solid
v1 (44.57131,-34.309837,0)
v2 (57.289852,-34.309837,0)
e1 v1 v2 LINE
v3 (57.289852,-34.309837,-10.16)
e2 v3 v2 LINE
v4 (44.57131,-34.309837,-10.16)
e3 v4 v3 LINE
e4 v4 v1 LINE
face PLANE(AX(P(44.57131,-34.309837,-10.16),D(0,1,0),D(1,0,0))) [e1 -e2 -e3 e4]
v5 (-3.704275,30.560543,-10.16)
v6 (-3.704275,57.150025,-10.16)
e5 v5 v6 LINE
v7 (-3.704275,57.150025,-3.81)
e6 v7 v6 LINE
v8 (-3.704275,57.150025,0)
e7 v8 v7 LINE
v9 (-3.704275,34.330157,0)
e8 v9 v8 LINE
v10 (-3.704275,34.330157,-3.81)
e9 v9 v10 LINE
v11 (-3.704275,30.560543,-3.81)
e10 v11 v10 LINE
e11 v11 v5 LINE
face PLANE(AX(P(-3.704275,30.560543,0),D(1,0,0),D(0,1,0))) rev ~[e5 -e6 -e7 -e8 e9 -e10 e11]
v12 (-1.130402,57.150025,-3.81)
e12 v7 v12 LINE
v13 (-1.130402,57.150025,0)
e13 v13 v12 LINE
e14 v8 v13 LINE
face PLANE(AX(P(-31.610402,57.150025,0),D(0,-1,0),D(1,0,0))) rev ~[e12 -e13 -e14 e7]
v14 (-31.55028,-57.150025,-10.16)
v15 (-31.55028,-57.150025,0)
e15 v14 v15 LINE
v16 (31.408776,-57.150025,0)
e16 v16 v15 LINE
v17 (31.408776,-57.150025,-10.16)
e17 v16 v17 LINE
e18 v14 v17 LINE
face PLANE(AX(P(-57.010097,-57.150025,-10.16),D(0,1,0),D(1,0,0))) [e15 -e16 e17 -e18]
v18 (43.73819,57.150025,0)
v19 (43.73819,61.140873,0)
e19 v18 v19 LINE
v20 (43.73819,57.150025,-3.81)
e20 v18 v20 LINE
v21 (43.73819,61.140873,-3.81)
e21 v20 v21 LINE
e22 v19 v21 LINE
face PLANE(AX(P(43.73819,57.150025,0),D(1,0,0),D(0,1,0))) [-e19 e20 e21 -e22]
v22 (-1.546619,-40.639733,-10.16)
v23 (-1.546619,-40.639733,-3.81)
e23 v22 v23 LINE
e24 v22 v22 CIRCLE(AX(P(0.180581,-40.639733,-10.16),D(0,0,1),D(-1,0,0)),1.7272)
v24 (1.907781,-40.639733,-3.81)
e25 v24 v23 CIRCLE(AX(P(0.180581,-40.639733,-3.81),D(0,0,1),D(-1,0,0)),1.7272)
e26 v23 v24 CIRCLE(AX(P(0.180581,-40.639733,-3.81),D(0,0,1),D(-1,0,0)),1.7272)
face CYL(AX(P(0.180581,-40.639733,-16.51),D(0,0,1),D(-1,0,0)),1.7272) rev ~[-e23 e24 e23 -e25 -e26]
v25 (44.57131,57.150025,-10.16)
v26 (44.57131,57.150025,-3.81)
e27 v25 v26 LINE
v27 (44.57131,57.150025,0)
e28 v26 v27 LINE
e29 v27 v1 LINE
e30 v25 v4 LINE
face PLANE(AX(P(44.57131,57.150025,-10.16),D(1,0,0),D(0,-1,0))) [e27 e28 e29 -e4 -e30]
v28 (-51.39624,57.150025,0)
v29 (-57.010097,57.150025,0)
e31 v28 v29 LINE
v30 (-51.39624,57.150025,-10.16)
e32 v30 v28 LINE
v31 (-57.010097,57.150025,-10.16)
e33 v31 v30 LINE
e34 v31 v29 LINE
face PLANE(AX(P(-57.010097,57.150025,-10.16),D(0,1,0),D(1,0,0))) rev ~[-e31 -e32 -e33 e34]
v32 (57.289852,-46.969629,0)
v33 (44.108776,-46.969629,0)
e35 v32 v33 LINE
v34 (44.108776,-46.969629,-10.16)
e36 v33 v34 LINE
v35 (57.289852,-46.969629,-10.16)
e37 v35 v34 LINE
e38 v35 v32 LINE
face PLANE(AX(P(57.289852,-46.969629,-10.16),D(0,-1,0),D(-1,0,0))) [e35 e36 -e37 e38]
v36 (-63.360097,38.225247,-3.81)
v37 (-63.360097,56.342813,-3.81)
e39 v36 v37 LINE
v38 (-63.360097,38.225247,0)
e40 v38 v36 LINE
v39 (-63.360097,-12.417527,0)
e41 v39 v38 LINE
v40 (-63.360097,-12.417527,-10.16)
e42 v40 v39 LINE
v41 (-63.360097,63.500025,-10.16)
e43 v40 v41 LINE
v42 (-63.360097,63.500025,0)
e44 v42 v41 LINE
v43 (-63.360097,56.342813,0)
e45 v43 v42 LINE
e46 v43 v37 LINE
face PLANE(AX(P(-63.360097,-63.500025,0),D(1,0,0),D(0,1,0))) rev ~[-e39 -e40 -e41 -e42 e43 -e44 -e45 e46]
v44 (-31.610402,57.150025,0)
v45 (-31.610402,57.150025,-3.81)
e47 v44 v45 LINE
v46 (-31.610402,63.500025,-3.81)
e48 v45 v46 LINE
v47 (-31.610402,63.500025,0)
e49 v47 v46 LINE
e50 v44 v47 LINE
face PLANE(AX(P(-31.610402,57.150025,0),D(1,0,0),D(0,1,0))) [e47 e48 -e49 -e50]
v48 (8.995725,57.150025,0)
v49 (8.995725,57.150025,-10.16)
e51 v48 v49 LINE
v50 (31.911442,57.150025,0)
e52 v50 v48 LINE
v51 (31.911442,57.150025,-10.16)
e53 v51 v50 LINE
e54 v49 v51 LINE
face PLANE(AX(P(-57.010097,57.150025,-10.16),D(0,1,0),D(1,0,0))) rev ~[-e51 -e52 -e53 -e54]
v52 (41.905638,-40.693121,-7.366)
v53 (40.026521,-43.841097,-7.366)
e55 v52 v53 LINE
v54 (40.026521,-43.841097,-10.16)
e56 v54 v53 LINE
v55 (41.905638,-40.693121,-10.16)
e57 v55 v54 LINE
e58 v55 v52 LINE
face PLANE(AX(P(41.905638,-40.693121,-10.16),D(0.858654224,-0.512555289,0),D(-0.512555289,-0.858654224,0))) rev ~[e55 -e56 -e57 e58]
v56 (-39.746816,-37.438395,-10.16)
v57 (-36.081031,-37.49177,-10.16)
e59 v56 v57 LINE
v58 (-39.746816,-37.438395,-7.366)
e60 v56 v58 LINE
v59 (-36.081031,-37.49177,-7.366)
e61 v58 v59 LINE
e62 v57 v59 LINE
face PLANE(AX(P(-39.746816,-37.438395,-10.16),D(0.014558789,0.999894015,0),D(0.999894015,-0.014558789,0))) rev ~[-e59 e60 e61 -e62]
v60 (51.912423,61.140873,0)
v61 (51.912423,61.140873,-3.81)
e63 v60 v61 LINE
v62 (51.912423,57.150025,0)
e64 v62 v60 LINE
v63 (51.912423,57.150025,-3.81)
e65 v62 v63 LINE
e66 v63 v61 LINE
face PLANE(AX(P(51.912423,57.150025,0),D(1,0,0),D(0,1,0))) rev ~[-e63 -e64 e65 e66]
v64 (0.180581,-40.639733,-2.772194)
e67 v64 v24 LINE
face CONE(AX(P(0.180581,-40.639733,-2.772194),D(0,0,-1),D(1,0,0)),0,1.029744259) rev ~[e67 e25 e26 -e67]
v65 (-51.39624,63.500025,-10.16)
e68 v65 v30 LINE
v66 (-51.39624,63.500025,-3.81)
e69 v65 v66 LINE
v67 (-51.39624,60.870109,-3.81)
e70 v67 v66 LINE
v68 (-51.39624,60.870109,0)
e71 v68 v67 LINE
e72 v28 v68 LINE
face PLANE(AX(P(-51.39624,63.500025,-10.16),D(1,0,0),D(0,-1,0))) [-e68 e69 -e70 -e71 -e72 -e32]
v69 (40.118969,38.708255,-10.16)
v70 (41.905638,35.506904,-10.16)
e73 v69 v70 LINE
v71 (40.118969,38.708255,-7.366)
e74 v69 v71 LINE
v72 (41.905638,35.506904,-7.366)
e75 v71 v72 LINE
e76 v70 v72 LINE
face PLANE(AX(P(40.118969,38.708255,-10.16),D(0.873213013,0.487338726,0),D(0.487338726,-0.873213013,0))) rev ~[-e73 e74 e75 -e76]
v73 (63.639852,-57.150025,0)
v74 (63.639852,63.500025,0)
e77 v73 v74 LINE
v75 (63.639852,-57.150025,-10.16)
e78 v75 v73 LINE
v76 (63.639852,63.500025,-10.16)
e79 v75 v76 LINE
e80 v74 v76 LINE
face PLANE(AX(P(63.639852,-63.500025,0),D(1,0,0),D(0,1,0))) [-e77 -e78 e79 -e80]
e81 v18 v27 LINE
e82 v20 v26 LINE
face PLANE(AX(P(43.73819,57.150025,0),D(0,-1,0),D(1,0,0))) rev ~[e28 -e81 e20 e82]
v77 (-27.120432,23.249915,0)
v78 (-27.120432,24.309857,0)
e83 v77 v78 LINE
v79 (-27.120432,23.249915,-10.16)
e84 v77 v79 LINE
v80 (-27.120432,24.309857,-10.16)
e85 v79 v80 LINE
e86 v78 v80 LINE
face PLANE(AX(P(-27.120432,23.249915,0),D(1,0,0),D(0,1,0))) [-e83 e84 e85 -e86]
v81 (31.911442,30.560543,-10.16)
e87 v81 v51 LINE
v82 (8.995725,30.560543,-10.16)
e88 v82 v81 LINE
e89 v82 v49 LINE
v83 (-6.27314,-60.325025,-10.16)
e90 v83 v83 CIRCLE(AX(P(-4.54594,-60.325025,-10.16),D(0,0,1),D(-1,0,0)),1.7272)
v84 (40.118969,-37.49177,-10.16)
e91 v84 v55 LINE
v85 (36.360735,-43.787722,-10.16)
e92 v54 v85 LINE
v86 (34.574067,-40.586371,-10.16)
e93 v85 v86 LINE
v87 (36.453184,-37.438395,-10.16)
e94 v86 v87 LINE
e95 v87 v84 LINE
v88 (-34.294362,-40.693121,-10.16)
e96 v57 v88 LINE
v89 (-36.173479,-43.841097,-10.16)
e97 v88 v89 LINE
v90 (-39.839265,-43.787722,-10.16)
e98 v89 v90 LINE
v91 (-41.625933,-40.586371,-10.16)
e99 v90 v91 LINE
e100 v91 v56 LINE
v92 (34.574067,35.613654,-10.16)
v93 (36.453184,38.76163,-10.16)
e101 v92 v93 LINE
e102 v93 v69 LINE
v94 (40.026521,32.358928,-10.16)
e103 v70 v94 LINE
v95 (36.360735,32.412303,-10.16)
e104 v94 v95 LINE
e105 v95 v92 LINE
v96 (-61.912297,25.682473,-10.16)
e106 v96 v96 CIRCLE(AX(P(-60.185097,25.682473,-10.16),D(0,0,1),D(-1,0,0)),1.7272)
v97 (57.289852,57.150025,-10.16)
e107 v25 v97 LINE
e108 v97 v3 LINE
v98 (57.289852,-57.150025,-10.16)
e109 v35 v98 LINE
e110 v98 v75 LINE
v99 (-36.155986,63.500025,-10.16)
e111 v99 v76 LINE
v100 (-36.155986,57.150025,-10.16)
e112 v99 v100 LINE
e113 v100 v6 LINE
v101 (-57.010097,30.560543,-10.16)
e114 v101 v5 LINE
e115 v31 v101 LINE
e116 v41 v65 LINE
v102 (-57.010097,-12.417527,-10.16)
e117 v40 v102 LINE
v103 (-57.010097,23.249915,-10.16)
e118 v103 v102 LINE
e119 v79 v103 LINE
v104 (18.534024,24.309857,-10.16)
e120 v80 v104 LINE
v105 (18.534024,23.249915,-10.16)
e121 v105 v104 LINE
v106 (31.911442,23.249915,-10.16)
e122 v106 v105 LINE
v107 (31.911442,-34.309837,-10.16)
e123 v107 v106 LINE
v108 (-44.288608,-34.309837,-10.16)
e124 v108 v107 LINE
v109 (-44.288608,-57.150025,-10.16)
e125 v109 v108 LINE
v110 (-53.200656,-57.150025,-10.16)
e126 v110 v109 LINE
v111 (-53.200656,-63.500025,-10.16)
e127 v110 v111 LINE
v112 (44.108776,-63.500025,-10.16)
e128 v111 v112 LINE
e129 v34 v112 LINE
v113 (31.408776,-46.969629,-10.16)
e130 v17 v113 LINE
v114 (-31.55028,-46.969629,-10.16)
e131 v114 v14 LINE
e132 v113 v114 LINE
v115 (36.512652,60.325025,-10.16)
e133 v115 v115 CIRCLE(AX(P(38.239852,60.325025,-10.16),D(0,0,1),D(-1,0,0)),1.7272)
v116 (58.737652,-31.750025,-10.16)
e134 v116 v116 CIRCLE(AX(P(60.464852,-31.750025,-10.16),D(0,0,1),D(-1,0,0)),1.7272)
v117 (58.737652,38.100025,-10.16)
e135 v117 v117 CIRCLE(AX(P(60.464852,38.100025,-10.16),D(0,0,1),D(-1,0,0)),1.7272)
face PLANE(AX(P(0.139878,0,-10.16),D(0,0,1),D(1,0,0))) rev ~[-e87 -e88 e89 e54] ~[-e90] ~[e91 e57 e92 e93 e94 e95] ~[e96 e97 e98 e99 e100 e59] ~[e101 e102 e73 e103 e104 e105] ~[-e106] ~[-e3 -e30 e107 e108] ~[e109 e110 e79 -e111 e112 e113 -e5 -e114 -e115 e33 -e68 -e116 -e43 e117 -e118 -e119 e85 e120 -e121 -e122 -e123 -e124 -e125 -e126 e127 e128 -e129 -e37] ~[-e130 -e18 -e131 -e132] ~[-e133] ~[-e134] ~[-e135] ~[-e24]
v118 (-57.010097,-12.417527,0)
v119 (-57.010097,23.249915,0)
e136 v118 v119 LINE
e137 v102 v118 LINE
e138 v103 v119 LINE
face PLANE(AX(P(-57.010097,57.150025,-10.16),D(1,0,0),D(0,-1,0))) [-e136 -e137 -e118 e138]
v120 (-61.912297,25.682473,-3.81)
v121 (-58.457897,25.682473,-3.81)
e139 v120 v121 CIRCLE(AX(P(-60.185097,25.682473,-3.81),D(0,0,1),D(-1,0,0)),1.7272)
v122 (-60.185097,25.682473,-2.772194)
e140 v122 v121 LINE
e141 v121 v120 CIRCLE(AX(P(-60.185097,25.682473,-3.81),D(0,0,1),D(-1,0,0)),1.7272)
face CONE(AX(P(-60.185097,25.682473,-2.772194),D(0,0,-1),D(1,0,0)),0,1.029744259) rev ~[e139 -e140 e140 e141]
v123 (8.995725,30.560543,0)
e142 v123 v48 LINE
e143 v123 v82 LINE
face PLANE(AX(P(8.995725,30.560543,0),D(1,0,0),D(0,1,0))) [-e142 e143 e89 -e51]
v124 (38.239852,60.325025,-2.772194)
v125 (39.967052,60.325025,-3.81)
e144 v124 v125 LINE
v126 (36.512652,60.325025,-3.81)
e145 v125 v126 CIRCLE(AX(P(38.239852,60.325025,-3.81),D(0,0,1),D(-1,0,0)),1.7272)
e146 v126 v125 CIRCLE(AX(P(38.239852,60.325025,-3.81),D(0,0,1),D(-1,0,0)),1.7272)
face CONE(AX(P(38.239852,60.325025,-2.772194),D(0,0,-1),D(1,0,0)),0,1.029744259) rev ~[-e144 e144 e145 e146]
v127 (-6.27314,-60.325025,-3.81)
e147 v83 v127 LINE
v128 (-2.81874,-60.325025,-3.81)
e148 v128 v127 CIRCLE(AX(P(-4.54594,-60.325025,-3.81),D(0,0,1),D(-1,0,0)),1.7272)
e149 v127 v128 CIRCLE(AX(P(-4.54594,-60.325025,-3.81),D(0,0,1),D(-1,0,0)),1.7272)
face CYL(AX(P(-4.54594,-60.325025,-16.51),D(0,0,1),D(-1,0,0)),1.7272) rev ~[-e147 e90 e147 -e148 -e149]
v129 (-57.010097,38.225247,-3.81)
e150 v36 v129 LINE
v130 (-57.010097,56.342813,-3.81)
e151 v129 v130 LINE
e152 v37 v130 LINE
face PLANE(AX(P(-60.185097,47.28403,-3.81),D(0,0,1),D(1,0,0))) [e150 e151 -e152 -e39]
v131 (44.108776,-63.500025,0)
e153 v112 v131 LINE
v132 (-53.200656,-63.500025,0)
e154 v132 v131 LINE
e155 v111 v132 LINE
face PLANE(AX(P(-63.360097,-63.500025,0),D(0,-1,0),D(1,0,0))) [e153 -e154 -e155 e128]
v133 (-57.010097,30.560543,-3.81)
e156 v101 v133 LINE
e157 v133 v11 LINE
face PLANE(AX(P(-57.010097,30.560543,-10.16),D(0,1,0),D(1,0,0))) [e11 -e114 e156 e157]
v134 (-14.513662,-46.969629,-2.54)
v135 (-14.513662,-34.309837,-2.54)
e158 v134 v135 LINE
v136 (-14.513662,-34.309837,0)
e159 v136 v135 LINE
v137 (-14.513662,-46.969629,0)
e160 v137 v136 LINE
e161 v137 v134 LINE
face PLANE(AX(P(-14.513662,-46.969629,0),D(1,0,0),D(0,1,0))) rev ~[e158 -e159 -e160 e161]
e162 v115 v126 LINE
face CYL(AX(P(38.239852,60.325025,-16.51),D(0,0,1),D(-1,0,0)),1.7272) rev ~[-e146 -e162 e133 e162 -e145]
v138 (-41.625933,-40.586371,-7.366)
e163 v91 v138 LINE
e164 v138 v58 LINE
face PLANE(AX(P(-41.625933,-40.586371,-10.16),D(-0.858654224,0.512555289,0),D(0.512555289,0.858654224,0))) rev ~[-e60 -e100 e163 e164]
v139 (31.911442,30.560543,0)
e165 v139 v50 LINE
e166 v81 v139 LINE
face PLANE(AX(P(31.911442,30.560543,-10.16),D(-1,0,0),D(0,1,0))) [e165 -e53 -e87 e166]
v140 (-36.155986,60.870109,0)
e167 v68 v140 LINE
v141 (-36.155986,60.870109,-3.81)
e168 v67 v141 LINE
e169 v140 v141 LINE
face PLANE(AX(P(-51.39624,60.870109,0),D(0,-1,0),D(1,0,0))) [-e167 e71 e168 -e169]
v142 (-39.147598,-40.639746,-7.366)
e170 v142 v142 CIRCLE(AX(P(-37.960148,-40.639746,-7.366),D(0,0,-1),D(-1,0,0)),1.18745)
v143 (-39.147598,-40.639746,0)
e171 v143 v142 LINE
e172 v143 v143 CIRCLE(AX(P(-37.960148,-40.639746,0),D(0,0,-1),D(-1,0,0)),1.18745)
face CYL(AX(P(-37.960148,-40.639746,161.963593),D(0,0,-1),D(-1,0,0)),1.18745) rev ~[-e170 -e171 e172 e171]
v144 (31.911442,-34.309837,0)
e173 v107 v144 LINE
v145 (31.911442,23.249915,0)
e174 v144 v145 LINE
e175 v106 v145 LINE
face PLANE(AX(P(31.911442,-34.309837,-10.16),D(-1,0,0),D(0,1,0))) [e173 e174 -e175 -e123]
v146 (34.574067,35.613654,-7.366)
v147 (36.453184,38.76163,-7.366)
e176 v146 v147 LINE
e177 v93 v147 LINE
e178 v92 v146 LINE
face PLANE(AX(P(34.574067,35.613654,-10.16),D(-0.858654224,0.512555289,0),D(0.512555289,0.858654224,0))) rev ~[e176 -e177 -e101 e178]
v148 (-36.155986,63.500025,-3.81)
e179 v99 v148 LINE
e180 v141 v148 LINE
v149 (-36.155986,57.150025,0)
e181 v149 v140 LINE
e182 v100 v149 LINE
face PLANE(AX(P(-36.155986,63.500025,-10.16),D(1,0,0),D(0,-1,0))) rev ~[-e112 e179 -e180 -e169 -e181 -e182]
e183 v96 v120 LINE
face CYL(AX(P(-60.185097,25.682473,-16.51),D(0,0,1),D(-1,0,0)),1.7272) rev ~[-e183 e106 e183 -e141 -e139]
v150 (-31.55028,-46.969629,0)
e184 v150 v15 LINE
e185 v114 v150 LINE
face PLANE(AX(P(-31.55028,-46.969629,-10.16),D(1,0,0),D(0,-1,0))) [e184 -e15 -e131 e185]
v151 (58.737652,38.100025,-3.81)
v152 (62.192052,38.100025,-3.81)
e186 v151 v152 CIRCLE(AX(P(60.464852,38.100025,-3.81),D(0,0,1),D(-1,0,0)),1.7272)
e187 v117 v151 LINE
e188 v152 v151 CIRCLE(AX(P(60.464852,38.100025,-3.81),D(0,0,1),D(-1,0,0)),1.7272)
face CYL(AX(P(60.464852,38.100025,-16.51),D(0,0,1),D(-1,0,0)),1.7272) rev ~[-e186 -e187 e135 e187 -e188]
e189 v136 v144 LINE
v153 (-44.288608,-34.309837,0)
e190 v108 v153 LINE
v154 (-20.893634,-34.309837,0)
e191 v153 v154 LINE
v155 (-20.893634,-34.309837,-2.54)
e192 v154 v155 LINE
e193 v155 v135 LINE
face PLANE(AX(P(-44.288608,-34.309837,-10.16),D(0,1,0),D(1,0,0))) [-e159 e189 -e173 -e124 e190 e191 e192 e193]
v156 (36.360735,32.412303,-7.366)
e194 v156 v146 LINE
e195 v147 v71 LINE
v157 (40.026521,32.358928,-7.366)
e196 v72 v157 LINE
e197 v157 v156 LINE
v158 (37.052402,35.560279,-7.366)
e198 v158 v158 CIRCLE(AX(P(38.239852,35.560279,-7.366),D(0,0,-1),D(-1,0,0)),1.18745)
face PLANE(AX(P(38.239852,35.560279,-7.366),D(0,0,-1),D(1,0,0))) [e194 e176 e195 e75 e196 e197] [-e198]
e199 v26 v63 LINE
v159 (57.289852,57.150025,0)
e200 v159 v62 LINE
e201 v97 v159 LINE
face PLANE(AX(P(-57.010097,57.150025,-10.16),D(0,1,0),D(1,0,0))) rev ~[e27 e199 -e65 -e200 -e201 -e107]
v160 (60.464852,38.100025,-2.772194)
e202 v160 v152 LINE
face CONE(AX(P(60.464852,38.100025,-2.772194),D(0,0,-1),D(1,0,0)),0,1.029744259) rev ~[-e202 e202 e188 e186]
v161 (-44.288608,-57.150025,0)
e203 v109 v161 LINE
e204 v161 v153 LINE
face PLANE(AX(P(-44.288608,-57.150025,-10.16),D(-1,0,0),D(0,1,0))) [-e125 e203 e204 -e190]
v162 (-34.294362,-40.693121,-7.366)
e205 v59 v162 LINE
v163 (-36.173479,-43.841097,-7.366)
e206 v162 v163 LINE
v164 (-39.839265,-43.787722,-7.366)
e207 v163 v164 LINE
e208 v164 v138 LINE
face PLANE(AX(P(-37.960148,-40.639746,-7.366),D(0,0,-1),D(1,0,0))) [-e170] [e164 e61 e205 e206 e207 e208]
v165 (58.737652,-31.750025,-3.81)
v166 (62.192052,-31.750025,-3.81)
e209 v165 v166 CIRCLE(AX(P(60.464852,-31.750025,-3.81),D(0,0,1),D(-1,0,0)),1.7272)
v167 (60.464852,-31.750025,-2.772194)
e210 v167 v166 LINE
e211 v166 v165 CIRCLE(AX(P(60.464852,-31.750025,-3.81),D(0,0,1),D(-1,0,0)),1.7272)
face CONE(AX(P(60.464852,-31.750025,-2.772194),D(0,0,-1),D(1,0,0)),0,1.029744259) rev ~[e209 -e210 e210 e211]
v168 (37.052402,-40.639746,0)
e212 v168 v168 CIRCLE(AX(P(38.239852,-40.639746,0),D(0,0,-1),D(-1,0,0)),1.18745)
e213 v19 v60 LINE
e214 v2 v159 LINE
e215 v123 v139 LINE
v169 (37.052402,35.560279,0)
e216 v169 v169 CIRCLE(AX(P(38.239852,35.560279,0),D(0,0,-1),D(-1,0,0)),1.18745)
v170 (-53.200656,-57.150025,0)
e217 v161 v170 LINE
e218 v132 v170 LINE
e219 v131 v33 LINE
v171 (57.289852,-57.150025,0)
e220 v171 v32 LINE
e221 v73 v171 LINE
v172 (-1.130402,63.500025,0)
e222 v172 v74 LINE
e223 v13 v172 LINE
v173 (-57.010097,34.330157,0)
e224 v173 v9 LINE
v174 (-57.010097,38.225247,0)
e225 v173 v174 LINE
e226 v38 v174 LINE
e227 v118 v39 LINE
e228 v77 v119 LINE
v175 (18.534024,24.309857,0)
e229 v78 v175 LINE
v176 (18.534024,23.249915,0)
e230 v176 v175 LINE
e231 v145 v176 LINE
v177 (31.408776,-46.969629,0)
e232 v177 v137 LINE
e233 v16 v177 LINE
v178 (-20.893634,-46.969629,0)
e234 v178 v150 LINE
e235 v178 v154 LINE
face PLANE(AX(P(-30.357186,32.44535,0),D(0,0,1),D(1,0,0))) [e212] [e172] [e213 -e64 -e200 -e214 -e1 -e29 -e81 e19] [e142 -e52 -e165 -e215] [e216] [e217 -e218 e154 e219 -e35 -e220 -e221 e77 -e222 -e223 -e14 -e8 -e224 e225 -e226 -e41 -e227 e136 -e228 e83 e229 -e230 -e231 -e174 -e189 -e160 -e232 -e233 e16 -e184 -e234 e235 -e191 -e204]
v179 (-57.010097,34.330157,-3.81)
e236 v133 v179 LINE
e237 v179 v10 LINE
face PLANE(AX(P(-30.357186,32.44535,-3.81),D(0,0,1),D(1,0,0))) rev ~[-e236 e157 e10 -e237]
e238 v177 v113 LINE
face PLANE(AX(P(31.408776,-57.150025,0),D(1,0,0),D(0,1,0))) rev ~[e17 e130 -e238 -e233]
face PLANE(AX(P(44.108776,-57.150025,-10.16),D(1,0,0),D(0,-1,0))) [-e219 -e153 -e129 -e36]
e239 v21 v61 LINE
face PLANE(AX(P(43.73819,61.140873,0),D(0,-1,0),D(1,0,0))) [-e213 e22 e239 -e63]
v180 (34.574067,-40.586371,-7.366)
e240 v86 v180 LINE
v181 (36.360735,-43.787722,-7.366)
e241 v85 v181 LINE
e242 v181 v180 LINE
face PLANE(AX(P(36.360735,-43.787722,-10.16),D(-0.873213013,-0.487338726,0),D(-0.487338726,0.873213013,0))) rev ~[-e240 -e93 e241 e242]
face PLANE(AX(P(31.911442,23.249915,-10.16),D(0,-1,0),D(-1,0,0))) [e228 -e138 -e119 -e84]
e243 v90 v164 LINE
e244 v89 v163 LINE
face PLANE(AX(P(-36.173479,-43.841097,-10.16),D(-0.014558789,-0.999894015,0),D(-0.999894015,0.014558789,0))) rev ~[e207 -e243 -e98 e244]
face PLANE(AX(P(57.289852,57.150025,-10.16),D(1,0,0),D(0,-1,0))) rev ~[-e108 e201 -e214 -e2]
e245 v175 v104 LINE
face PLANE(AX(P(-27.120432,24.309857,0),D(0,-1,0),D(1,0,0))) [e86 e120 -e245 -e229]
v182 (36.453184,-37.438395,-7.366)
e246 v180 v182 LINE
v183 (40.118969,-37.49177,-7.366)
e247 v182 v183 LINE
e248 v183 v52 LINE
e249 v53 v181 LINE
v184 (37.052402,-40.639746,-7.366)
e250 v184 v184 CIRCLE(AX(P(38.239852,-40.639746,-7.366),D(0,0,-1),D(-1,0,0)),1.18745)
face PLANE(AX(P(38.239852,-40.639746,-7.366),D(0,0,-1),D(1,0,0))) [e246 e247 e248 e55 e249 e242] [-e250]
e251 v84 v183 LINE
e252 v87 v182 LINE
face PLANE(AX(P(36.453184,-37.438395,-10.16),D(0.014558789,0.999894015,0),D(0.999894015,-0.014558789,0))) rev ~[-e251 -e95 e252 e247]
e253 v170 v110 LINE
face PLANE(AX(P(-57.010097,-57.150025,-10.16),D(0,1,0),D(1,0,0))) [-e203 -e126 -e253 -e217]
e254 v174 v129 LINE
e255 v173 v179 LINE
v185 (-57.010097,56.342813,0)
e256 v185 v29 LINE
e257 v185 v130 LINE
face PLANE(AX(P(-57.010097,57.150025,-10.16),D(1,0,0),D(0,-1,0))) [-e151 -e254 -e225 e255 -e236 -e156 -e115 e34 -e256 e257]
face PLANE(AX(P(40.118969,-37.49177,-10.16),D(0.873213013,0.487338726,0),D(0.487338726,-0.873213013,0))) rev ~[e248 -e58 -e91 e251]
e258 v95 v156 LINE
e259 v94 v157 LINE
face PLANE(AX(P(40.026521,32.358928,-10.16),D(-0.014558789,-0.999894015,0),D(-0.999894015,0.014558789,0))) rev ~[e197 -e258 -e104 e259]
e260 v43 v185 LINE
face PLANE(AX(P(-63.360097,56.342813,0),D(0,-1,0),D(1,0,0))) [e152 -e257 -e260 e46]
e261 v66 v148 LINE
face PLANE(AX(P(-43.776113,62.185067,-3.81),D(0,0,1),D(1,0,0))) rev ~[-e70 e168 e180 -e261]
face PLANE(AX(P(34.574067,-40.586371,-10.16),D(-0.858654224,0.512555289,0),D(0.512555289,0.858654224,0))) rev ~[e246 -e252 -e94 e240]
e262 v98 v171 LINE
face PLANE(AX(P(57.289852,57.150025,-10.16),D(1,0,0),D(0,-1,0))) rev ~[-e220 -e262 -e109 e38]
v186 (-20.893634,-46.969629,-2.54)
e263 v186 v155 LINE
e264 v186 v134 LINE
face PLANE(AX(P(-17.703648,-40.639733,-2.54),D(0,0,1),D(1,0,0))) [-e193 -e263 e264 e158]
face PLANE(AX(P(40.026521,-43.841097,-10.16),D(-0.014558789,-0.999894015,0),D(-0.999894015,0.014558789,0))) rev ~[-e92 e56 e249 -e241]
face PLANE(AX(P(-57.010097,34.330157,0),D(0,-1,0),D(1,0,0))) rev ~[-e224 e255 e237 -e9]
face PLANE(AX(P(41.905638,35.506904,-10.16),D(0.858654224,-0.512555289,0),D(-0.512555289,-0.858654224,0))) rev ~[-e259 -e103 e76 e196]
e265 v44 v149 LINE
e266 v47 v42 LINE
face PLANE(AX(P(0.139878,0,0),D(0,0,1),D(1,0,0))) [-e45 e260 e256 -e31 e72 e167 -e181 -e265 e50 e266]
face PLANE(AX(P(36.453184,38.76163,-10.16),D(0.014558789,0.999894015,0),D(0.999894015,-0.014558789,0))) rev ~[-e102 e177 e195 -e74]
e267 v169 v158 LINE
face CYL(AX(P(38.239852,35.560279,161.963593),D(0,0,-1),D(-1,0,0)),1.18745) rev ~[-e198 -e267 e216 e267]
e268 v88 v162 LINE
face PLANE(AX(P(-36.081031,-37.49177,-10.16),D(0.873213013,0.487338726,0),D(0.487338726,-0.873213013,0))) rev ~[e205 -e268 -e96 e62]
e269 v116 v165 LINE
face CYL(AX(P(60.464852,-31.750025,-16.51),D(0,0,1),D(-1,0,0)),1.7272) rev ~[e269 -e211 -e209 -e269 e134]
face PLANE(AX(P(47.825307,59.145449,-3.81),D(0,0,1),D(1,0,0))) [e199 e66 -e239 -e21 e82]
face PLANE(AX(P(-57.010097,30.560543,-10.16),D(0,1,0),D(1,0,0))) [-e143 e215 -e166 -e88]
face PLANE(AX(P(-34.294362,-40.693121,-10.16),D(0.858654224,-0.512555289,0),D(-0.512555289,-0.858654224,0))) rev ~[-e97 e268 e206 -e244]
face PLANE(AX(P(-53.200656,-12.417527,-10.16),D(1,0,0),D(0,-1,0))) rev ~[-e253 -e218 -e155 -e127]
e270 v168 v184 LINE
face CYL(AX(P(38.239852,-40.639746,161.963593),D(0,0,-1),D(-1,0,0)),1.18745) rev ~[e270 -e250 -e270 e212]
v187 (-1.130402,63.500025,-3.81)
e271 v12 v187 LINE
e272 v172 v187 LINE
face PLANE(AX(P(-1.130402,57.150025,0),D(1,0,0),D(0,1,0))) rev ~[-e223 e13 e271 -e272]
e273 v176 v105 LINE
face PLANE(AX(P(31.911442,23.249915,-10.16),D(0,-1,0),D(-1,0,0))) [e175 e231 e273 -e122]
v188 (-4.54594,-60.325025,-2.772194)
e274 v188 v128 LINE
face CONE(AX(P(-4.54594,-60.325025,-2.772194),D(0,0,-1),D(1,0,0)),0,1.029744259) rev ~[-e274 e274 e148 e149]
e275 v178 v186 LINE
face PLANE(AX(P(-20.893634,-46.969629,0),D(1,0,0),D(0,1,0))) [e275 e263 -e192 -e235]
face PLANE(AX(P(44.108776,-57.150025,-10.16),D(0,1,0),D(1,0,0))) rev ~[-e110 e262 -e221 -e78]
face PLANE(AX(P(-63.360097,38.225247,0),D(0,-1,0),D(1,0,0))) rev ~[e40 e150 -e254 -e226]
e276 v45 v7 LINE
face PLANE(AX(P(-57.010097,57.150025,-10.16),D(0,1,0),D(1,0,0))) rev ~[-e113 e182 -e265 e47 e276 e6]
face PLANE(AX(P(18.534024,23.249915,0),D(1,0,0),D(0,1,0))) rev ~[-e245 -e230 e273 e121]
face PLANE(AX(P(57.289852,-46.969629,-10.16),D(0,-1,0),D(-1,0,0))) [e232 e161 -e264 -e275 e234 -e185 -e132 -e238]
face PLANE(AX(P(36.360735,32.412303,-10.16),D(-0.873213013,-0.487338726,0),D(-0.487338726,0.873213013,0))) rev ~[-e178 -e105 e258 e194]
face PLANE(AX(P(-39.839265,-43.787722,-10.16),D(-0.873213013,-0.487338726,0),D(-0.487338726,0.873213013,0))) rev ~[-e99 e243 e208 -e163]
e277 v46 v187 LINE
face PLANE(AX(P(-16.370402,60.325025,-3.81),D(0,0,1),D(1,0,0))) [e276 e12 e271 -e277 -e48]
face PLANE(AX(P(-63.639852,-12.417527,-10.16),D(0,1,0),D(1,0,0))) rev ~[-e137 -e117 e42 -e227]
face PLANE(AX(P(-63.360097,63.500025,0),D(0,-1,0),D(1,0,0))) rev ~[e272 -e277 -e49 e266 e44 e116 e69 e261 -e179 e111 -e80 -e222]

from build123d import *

# Parameters (mm, degrees)
F1_W      = 126.9999492
F1_H      = 127.0000508
F2_DEPTH  = 10.16
F3_W      = 114.2999492
F3_H      = 114.3000508
F4_DEPTH  = 10.161
F5_W      = 10.4391968
F5_H      = 51.0824988
F5_W_2    = 15.240254
F5_H_2    = 6.35
F5_W_3    = 19.531076
F6_DEPTH  = 10.161
F7_W      = 6.3186603262
F7_H      = 12.6597918
F8_DEPTH  = 10.16
F10_D     = 2.3749
F11_R     = 1.18745
F12_DEPTH = 2.794
F15_W     = 12.7
F15_H     = 26.589482
F16_DEPTH = 10.16
F15_H_2   = 10.1803962
F18_D     = 3.4544
F18_DEPTH = 6.35
F18_TIP   = 1.0378064612
F9_W      = 6.35
F9_H      = 18.117566
F9_W_2    = 30.48
F9_H_2    = 6.35
F9_W_3    = 8.1742328233
F9_H_3    = 3.990848
F19_DEPTH = 3.81
F20_W     = 45.6544562851
F20_H     = 1.059942
F21_DEPTH = 10.161
F22_W     = 53.3058220283
F22_H     = 3.769614
F22_W_2   = 15.240254
F22_H_2   = 2.629916
F23_DEPTH = 3.81
F24_W     = 6.379972
F24_H     = 12.6597918
F25_DEPTH = 2.54


# Not quite as in the source:
# - a feature names something its author has since deleted; it is built from what else it names


with BuildPart() as f2:
    # F1 (on Top) → F2 (new body)
    with BuildSketch(Plane.XY):
        with Locations((0.1398778, 0)):
            Rectangle(F1_W, F1_H)
    extrude(amount=-F2_DEPTH)

    # F3 (on face) → F4 (cut, through all)
    with BuildSketch(Plane(origin=(0, 0, -10.16), x_dir=(1, 0, 0), z_dir=(0, 0, -1))):
        with Locations((0.1398778, 0)):
            Rectangle(F3_W, F3_H)
    extrude(amount=-F4_DEPTH, mode=Mode.SUBTRACT)

    # F5 (on face) → F6 (cut, through all)
    with BuildSketch(Plane(origin=(0, 0, -10.16), x_dir=(1, 0, 0), z_dir=(0, 0, -1))):
        with Locations((-58.420254, 37.958776)):
            Rectangle(F5_W, F5_H)
        with Locations((-43.7761126, -60.3250254)):
            Rectangle(F5_W_2, F5_H_2)
        with Locations((53.8743144, 60.3250254)):
            Rectangle(F5_W_3, F5_H_2)
    extrude(amount=-F6_DEPTH, mode=Mode.SUBTRACT)


with BuildPart() as f8:
    # F7 (on face) → F8 (new body)
    with BuildSketch(Plane(origin=(0, 0, -10.16), x_dir=(1, 0, 0), z_dir=(0, 0, -1))):
        Polygon((-37.8689406421, 34.3098374), (-37.8689406421, 46.9696292), (-31.5502803159, 46.9696292), (-31.5502803159, 57.1500254), (-44.2886084, 57.1500254), (-44.2886084, 34.3098374), align=None)
        with Locations((-34.709610479, 40.6397333)):
            Rectangle(F7_W, F7_H)
        Polygon((57.2898524, 46.9696292), (-31.5502803159, 46.9696292), (-31.5502803159, 34.3098374), (31.9114424, 34.3098374), (44.5713104, 34.3098374), (57.2898524, 34.3098374), align=None)
        Polygon((44.5713104, 34.3098374), (31.9114424, 34.3098374), (31.9114424, -23.2499154), (31.9114424, -29.2427535486), (31.9114424, -30.5605434), (31.9114424, -41.8902134), (31.9114424, -57.1500254), (44.5713104, -57.1500254), align=None)
        Polygon((31.9114424, -29.2427535486), (31.9114424, -23.2499154), (-57.0100968, -23.2499154), (-57.0100968, -30.5605434), (31.9114424, -30.5605434), align=None)
    extrude(amount=-F8_DEPTH)

    # F10 (through all)
    with Locations(Plane.XY):
        with Locations((38.2398524, 35.5602794), (38.2398524, -40.639746), (-37.9601476, -40.639746)):
            Hole(F10_D / 2)

    # F11 (on face) → F12 (cut)
    with BuildSketch(Plane(origin=(0, 0, -10.16), x_dir=(1, 0, 0), z_dir=(0, 0, -1))):
        Polygon((-34.2943619493, 40.693121057), (-36.17347893, 43.8410970268), (-39.8392645806, 43.7877219698), (-41.6259332507, 40.586370943), (-39.74681627, 37.4383949732), (-36.0810306194, 37.4917700302), align=None)
        with Locations((-37.9601476, 40.639746)):
            Circle(F11_R, mode=Mode.SUBTRACT)
        Polygon((34.5740667493, 40.586370943), (36.45318373, 37.4383949732), (40.1189693806, 37.4917700302), (41.9056380507, 40.693121057), (40.02652107, 43.8410970268), (36.3607354194, 43.7877219698), align=None)
        Polygon((36.3607354194, -32.4123034302), (34.5740667493, -35.613654457), (36.45318373, -38.7616304268), (40.1189693806, -38.7082553698), (41.9056380507, -35.506904343), (40.02652107, -32.3589283732), align=None)
    extrude(amount=-F12_DEPTH, mode=Mode.SUBTRACT)

    # F14: union F2
    add(f2.part)


with BuildPart() as f16:
    # F15 (on face) → F16 (new body, through all)
    with BuildSketch(Plane.XY):
        with Locations((2.6457252283, 43.8552844)):
            Rectangle(F15_W, F15_H)
    extrude(amount=-F16_DEPTH)


with BuildPart() as f16b:
    # F15 (on face) → F16, piece 2 (new body, through all)
    with BuildSketch(Plane.XY):
        with Locations((37.7587764, -52.0598273)):
            Rectangle(F15_W, F15_H_2)
    extrude(amount=-F16_DEPTH)


with BuildPart() as f16_1:
    add(f16.part)

    # F17: union F16b, F8
    add(f16b.part)
    add(f8.part)

    # F18
    with Locations(Plane(origin=(0, 0, -10.16), x_dir=(1, 0, 0), z_dir=(0, 0, -1))):
        with Locations((0.1805810421, 40.6397333), (-4.5459396, 60.3250254), (-60.1850968, -25.6824734), (38.2398524, -60.3250254), (60.4648524, -38.1000254), (60.4648524, 31.7500254)):
            Hole(F18_D / 2, depth=F18_DEPTH)
            with Locations((0, 0, -(F18_DEPTH + F18_TIP / 2))):  # 118° drill point
                Cone(0, F18_D / 2, F18_TIP, mode=Mode.SUBTRACT)

    # F9 (on face) → F19 (cut)
    with BuildSketch(Plane.XY):
        with Locations((-60.1850968, 47.2840304)):
            Rectangle(F9_W, F9_H)
        with Locations((-16.3704016, 60.3250254)):
            Rectangle(F9_W_2, F9_H_2)
        with Locations((47.8253068116, 59.1454494)):
            Rectangle(F9_W_3, F9_H_3)
    extrude(amount=-F19_DEPTH, mode=Mode.SUBTRACT)

    # F20 (on face) → F21 (cut, through all)
    with BuildSketch(Plane.XY):
        with Locations((-4.2932037426, 23.7798864)):
            Rectangle(F20_W, F20_H)
    extrude(amount=-F21_DEPTH, mode=Mode.SUBTRACT)

    # F22 (on face) → F23 (join)
    with BuildSketch(Plane.XY):
        with Locations((-30.3571857859, 32.4453504)):
            Rectangle(F22_W, F22_H)
        with Locations((-43.7761126, 62.1850674)):
            Rectangle(F22_W_2, F22_H_2)
    extrude(amount=-F23_DEPTH)

    # F24 (on face) → F25 (cut)
    with BuildSketch(Plane.XY):
        with Locations((-17.7036476, -40.6397333)):
            Rectangle(F24_W, F24_H)
    extrude(amount=-F25_DEPTH, mode=Mode.SUBTRACT)


solid = f16_1.part
